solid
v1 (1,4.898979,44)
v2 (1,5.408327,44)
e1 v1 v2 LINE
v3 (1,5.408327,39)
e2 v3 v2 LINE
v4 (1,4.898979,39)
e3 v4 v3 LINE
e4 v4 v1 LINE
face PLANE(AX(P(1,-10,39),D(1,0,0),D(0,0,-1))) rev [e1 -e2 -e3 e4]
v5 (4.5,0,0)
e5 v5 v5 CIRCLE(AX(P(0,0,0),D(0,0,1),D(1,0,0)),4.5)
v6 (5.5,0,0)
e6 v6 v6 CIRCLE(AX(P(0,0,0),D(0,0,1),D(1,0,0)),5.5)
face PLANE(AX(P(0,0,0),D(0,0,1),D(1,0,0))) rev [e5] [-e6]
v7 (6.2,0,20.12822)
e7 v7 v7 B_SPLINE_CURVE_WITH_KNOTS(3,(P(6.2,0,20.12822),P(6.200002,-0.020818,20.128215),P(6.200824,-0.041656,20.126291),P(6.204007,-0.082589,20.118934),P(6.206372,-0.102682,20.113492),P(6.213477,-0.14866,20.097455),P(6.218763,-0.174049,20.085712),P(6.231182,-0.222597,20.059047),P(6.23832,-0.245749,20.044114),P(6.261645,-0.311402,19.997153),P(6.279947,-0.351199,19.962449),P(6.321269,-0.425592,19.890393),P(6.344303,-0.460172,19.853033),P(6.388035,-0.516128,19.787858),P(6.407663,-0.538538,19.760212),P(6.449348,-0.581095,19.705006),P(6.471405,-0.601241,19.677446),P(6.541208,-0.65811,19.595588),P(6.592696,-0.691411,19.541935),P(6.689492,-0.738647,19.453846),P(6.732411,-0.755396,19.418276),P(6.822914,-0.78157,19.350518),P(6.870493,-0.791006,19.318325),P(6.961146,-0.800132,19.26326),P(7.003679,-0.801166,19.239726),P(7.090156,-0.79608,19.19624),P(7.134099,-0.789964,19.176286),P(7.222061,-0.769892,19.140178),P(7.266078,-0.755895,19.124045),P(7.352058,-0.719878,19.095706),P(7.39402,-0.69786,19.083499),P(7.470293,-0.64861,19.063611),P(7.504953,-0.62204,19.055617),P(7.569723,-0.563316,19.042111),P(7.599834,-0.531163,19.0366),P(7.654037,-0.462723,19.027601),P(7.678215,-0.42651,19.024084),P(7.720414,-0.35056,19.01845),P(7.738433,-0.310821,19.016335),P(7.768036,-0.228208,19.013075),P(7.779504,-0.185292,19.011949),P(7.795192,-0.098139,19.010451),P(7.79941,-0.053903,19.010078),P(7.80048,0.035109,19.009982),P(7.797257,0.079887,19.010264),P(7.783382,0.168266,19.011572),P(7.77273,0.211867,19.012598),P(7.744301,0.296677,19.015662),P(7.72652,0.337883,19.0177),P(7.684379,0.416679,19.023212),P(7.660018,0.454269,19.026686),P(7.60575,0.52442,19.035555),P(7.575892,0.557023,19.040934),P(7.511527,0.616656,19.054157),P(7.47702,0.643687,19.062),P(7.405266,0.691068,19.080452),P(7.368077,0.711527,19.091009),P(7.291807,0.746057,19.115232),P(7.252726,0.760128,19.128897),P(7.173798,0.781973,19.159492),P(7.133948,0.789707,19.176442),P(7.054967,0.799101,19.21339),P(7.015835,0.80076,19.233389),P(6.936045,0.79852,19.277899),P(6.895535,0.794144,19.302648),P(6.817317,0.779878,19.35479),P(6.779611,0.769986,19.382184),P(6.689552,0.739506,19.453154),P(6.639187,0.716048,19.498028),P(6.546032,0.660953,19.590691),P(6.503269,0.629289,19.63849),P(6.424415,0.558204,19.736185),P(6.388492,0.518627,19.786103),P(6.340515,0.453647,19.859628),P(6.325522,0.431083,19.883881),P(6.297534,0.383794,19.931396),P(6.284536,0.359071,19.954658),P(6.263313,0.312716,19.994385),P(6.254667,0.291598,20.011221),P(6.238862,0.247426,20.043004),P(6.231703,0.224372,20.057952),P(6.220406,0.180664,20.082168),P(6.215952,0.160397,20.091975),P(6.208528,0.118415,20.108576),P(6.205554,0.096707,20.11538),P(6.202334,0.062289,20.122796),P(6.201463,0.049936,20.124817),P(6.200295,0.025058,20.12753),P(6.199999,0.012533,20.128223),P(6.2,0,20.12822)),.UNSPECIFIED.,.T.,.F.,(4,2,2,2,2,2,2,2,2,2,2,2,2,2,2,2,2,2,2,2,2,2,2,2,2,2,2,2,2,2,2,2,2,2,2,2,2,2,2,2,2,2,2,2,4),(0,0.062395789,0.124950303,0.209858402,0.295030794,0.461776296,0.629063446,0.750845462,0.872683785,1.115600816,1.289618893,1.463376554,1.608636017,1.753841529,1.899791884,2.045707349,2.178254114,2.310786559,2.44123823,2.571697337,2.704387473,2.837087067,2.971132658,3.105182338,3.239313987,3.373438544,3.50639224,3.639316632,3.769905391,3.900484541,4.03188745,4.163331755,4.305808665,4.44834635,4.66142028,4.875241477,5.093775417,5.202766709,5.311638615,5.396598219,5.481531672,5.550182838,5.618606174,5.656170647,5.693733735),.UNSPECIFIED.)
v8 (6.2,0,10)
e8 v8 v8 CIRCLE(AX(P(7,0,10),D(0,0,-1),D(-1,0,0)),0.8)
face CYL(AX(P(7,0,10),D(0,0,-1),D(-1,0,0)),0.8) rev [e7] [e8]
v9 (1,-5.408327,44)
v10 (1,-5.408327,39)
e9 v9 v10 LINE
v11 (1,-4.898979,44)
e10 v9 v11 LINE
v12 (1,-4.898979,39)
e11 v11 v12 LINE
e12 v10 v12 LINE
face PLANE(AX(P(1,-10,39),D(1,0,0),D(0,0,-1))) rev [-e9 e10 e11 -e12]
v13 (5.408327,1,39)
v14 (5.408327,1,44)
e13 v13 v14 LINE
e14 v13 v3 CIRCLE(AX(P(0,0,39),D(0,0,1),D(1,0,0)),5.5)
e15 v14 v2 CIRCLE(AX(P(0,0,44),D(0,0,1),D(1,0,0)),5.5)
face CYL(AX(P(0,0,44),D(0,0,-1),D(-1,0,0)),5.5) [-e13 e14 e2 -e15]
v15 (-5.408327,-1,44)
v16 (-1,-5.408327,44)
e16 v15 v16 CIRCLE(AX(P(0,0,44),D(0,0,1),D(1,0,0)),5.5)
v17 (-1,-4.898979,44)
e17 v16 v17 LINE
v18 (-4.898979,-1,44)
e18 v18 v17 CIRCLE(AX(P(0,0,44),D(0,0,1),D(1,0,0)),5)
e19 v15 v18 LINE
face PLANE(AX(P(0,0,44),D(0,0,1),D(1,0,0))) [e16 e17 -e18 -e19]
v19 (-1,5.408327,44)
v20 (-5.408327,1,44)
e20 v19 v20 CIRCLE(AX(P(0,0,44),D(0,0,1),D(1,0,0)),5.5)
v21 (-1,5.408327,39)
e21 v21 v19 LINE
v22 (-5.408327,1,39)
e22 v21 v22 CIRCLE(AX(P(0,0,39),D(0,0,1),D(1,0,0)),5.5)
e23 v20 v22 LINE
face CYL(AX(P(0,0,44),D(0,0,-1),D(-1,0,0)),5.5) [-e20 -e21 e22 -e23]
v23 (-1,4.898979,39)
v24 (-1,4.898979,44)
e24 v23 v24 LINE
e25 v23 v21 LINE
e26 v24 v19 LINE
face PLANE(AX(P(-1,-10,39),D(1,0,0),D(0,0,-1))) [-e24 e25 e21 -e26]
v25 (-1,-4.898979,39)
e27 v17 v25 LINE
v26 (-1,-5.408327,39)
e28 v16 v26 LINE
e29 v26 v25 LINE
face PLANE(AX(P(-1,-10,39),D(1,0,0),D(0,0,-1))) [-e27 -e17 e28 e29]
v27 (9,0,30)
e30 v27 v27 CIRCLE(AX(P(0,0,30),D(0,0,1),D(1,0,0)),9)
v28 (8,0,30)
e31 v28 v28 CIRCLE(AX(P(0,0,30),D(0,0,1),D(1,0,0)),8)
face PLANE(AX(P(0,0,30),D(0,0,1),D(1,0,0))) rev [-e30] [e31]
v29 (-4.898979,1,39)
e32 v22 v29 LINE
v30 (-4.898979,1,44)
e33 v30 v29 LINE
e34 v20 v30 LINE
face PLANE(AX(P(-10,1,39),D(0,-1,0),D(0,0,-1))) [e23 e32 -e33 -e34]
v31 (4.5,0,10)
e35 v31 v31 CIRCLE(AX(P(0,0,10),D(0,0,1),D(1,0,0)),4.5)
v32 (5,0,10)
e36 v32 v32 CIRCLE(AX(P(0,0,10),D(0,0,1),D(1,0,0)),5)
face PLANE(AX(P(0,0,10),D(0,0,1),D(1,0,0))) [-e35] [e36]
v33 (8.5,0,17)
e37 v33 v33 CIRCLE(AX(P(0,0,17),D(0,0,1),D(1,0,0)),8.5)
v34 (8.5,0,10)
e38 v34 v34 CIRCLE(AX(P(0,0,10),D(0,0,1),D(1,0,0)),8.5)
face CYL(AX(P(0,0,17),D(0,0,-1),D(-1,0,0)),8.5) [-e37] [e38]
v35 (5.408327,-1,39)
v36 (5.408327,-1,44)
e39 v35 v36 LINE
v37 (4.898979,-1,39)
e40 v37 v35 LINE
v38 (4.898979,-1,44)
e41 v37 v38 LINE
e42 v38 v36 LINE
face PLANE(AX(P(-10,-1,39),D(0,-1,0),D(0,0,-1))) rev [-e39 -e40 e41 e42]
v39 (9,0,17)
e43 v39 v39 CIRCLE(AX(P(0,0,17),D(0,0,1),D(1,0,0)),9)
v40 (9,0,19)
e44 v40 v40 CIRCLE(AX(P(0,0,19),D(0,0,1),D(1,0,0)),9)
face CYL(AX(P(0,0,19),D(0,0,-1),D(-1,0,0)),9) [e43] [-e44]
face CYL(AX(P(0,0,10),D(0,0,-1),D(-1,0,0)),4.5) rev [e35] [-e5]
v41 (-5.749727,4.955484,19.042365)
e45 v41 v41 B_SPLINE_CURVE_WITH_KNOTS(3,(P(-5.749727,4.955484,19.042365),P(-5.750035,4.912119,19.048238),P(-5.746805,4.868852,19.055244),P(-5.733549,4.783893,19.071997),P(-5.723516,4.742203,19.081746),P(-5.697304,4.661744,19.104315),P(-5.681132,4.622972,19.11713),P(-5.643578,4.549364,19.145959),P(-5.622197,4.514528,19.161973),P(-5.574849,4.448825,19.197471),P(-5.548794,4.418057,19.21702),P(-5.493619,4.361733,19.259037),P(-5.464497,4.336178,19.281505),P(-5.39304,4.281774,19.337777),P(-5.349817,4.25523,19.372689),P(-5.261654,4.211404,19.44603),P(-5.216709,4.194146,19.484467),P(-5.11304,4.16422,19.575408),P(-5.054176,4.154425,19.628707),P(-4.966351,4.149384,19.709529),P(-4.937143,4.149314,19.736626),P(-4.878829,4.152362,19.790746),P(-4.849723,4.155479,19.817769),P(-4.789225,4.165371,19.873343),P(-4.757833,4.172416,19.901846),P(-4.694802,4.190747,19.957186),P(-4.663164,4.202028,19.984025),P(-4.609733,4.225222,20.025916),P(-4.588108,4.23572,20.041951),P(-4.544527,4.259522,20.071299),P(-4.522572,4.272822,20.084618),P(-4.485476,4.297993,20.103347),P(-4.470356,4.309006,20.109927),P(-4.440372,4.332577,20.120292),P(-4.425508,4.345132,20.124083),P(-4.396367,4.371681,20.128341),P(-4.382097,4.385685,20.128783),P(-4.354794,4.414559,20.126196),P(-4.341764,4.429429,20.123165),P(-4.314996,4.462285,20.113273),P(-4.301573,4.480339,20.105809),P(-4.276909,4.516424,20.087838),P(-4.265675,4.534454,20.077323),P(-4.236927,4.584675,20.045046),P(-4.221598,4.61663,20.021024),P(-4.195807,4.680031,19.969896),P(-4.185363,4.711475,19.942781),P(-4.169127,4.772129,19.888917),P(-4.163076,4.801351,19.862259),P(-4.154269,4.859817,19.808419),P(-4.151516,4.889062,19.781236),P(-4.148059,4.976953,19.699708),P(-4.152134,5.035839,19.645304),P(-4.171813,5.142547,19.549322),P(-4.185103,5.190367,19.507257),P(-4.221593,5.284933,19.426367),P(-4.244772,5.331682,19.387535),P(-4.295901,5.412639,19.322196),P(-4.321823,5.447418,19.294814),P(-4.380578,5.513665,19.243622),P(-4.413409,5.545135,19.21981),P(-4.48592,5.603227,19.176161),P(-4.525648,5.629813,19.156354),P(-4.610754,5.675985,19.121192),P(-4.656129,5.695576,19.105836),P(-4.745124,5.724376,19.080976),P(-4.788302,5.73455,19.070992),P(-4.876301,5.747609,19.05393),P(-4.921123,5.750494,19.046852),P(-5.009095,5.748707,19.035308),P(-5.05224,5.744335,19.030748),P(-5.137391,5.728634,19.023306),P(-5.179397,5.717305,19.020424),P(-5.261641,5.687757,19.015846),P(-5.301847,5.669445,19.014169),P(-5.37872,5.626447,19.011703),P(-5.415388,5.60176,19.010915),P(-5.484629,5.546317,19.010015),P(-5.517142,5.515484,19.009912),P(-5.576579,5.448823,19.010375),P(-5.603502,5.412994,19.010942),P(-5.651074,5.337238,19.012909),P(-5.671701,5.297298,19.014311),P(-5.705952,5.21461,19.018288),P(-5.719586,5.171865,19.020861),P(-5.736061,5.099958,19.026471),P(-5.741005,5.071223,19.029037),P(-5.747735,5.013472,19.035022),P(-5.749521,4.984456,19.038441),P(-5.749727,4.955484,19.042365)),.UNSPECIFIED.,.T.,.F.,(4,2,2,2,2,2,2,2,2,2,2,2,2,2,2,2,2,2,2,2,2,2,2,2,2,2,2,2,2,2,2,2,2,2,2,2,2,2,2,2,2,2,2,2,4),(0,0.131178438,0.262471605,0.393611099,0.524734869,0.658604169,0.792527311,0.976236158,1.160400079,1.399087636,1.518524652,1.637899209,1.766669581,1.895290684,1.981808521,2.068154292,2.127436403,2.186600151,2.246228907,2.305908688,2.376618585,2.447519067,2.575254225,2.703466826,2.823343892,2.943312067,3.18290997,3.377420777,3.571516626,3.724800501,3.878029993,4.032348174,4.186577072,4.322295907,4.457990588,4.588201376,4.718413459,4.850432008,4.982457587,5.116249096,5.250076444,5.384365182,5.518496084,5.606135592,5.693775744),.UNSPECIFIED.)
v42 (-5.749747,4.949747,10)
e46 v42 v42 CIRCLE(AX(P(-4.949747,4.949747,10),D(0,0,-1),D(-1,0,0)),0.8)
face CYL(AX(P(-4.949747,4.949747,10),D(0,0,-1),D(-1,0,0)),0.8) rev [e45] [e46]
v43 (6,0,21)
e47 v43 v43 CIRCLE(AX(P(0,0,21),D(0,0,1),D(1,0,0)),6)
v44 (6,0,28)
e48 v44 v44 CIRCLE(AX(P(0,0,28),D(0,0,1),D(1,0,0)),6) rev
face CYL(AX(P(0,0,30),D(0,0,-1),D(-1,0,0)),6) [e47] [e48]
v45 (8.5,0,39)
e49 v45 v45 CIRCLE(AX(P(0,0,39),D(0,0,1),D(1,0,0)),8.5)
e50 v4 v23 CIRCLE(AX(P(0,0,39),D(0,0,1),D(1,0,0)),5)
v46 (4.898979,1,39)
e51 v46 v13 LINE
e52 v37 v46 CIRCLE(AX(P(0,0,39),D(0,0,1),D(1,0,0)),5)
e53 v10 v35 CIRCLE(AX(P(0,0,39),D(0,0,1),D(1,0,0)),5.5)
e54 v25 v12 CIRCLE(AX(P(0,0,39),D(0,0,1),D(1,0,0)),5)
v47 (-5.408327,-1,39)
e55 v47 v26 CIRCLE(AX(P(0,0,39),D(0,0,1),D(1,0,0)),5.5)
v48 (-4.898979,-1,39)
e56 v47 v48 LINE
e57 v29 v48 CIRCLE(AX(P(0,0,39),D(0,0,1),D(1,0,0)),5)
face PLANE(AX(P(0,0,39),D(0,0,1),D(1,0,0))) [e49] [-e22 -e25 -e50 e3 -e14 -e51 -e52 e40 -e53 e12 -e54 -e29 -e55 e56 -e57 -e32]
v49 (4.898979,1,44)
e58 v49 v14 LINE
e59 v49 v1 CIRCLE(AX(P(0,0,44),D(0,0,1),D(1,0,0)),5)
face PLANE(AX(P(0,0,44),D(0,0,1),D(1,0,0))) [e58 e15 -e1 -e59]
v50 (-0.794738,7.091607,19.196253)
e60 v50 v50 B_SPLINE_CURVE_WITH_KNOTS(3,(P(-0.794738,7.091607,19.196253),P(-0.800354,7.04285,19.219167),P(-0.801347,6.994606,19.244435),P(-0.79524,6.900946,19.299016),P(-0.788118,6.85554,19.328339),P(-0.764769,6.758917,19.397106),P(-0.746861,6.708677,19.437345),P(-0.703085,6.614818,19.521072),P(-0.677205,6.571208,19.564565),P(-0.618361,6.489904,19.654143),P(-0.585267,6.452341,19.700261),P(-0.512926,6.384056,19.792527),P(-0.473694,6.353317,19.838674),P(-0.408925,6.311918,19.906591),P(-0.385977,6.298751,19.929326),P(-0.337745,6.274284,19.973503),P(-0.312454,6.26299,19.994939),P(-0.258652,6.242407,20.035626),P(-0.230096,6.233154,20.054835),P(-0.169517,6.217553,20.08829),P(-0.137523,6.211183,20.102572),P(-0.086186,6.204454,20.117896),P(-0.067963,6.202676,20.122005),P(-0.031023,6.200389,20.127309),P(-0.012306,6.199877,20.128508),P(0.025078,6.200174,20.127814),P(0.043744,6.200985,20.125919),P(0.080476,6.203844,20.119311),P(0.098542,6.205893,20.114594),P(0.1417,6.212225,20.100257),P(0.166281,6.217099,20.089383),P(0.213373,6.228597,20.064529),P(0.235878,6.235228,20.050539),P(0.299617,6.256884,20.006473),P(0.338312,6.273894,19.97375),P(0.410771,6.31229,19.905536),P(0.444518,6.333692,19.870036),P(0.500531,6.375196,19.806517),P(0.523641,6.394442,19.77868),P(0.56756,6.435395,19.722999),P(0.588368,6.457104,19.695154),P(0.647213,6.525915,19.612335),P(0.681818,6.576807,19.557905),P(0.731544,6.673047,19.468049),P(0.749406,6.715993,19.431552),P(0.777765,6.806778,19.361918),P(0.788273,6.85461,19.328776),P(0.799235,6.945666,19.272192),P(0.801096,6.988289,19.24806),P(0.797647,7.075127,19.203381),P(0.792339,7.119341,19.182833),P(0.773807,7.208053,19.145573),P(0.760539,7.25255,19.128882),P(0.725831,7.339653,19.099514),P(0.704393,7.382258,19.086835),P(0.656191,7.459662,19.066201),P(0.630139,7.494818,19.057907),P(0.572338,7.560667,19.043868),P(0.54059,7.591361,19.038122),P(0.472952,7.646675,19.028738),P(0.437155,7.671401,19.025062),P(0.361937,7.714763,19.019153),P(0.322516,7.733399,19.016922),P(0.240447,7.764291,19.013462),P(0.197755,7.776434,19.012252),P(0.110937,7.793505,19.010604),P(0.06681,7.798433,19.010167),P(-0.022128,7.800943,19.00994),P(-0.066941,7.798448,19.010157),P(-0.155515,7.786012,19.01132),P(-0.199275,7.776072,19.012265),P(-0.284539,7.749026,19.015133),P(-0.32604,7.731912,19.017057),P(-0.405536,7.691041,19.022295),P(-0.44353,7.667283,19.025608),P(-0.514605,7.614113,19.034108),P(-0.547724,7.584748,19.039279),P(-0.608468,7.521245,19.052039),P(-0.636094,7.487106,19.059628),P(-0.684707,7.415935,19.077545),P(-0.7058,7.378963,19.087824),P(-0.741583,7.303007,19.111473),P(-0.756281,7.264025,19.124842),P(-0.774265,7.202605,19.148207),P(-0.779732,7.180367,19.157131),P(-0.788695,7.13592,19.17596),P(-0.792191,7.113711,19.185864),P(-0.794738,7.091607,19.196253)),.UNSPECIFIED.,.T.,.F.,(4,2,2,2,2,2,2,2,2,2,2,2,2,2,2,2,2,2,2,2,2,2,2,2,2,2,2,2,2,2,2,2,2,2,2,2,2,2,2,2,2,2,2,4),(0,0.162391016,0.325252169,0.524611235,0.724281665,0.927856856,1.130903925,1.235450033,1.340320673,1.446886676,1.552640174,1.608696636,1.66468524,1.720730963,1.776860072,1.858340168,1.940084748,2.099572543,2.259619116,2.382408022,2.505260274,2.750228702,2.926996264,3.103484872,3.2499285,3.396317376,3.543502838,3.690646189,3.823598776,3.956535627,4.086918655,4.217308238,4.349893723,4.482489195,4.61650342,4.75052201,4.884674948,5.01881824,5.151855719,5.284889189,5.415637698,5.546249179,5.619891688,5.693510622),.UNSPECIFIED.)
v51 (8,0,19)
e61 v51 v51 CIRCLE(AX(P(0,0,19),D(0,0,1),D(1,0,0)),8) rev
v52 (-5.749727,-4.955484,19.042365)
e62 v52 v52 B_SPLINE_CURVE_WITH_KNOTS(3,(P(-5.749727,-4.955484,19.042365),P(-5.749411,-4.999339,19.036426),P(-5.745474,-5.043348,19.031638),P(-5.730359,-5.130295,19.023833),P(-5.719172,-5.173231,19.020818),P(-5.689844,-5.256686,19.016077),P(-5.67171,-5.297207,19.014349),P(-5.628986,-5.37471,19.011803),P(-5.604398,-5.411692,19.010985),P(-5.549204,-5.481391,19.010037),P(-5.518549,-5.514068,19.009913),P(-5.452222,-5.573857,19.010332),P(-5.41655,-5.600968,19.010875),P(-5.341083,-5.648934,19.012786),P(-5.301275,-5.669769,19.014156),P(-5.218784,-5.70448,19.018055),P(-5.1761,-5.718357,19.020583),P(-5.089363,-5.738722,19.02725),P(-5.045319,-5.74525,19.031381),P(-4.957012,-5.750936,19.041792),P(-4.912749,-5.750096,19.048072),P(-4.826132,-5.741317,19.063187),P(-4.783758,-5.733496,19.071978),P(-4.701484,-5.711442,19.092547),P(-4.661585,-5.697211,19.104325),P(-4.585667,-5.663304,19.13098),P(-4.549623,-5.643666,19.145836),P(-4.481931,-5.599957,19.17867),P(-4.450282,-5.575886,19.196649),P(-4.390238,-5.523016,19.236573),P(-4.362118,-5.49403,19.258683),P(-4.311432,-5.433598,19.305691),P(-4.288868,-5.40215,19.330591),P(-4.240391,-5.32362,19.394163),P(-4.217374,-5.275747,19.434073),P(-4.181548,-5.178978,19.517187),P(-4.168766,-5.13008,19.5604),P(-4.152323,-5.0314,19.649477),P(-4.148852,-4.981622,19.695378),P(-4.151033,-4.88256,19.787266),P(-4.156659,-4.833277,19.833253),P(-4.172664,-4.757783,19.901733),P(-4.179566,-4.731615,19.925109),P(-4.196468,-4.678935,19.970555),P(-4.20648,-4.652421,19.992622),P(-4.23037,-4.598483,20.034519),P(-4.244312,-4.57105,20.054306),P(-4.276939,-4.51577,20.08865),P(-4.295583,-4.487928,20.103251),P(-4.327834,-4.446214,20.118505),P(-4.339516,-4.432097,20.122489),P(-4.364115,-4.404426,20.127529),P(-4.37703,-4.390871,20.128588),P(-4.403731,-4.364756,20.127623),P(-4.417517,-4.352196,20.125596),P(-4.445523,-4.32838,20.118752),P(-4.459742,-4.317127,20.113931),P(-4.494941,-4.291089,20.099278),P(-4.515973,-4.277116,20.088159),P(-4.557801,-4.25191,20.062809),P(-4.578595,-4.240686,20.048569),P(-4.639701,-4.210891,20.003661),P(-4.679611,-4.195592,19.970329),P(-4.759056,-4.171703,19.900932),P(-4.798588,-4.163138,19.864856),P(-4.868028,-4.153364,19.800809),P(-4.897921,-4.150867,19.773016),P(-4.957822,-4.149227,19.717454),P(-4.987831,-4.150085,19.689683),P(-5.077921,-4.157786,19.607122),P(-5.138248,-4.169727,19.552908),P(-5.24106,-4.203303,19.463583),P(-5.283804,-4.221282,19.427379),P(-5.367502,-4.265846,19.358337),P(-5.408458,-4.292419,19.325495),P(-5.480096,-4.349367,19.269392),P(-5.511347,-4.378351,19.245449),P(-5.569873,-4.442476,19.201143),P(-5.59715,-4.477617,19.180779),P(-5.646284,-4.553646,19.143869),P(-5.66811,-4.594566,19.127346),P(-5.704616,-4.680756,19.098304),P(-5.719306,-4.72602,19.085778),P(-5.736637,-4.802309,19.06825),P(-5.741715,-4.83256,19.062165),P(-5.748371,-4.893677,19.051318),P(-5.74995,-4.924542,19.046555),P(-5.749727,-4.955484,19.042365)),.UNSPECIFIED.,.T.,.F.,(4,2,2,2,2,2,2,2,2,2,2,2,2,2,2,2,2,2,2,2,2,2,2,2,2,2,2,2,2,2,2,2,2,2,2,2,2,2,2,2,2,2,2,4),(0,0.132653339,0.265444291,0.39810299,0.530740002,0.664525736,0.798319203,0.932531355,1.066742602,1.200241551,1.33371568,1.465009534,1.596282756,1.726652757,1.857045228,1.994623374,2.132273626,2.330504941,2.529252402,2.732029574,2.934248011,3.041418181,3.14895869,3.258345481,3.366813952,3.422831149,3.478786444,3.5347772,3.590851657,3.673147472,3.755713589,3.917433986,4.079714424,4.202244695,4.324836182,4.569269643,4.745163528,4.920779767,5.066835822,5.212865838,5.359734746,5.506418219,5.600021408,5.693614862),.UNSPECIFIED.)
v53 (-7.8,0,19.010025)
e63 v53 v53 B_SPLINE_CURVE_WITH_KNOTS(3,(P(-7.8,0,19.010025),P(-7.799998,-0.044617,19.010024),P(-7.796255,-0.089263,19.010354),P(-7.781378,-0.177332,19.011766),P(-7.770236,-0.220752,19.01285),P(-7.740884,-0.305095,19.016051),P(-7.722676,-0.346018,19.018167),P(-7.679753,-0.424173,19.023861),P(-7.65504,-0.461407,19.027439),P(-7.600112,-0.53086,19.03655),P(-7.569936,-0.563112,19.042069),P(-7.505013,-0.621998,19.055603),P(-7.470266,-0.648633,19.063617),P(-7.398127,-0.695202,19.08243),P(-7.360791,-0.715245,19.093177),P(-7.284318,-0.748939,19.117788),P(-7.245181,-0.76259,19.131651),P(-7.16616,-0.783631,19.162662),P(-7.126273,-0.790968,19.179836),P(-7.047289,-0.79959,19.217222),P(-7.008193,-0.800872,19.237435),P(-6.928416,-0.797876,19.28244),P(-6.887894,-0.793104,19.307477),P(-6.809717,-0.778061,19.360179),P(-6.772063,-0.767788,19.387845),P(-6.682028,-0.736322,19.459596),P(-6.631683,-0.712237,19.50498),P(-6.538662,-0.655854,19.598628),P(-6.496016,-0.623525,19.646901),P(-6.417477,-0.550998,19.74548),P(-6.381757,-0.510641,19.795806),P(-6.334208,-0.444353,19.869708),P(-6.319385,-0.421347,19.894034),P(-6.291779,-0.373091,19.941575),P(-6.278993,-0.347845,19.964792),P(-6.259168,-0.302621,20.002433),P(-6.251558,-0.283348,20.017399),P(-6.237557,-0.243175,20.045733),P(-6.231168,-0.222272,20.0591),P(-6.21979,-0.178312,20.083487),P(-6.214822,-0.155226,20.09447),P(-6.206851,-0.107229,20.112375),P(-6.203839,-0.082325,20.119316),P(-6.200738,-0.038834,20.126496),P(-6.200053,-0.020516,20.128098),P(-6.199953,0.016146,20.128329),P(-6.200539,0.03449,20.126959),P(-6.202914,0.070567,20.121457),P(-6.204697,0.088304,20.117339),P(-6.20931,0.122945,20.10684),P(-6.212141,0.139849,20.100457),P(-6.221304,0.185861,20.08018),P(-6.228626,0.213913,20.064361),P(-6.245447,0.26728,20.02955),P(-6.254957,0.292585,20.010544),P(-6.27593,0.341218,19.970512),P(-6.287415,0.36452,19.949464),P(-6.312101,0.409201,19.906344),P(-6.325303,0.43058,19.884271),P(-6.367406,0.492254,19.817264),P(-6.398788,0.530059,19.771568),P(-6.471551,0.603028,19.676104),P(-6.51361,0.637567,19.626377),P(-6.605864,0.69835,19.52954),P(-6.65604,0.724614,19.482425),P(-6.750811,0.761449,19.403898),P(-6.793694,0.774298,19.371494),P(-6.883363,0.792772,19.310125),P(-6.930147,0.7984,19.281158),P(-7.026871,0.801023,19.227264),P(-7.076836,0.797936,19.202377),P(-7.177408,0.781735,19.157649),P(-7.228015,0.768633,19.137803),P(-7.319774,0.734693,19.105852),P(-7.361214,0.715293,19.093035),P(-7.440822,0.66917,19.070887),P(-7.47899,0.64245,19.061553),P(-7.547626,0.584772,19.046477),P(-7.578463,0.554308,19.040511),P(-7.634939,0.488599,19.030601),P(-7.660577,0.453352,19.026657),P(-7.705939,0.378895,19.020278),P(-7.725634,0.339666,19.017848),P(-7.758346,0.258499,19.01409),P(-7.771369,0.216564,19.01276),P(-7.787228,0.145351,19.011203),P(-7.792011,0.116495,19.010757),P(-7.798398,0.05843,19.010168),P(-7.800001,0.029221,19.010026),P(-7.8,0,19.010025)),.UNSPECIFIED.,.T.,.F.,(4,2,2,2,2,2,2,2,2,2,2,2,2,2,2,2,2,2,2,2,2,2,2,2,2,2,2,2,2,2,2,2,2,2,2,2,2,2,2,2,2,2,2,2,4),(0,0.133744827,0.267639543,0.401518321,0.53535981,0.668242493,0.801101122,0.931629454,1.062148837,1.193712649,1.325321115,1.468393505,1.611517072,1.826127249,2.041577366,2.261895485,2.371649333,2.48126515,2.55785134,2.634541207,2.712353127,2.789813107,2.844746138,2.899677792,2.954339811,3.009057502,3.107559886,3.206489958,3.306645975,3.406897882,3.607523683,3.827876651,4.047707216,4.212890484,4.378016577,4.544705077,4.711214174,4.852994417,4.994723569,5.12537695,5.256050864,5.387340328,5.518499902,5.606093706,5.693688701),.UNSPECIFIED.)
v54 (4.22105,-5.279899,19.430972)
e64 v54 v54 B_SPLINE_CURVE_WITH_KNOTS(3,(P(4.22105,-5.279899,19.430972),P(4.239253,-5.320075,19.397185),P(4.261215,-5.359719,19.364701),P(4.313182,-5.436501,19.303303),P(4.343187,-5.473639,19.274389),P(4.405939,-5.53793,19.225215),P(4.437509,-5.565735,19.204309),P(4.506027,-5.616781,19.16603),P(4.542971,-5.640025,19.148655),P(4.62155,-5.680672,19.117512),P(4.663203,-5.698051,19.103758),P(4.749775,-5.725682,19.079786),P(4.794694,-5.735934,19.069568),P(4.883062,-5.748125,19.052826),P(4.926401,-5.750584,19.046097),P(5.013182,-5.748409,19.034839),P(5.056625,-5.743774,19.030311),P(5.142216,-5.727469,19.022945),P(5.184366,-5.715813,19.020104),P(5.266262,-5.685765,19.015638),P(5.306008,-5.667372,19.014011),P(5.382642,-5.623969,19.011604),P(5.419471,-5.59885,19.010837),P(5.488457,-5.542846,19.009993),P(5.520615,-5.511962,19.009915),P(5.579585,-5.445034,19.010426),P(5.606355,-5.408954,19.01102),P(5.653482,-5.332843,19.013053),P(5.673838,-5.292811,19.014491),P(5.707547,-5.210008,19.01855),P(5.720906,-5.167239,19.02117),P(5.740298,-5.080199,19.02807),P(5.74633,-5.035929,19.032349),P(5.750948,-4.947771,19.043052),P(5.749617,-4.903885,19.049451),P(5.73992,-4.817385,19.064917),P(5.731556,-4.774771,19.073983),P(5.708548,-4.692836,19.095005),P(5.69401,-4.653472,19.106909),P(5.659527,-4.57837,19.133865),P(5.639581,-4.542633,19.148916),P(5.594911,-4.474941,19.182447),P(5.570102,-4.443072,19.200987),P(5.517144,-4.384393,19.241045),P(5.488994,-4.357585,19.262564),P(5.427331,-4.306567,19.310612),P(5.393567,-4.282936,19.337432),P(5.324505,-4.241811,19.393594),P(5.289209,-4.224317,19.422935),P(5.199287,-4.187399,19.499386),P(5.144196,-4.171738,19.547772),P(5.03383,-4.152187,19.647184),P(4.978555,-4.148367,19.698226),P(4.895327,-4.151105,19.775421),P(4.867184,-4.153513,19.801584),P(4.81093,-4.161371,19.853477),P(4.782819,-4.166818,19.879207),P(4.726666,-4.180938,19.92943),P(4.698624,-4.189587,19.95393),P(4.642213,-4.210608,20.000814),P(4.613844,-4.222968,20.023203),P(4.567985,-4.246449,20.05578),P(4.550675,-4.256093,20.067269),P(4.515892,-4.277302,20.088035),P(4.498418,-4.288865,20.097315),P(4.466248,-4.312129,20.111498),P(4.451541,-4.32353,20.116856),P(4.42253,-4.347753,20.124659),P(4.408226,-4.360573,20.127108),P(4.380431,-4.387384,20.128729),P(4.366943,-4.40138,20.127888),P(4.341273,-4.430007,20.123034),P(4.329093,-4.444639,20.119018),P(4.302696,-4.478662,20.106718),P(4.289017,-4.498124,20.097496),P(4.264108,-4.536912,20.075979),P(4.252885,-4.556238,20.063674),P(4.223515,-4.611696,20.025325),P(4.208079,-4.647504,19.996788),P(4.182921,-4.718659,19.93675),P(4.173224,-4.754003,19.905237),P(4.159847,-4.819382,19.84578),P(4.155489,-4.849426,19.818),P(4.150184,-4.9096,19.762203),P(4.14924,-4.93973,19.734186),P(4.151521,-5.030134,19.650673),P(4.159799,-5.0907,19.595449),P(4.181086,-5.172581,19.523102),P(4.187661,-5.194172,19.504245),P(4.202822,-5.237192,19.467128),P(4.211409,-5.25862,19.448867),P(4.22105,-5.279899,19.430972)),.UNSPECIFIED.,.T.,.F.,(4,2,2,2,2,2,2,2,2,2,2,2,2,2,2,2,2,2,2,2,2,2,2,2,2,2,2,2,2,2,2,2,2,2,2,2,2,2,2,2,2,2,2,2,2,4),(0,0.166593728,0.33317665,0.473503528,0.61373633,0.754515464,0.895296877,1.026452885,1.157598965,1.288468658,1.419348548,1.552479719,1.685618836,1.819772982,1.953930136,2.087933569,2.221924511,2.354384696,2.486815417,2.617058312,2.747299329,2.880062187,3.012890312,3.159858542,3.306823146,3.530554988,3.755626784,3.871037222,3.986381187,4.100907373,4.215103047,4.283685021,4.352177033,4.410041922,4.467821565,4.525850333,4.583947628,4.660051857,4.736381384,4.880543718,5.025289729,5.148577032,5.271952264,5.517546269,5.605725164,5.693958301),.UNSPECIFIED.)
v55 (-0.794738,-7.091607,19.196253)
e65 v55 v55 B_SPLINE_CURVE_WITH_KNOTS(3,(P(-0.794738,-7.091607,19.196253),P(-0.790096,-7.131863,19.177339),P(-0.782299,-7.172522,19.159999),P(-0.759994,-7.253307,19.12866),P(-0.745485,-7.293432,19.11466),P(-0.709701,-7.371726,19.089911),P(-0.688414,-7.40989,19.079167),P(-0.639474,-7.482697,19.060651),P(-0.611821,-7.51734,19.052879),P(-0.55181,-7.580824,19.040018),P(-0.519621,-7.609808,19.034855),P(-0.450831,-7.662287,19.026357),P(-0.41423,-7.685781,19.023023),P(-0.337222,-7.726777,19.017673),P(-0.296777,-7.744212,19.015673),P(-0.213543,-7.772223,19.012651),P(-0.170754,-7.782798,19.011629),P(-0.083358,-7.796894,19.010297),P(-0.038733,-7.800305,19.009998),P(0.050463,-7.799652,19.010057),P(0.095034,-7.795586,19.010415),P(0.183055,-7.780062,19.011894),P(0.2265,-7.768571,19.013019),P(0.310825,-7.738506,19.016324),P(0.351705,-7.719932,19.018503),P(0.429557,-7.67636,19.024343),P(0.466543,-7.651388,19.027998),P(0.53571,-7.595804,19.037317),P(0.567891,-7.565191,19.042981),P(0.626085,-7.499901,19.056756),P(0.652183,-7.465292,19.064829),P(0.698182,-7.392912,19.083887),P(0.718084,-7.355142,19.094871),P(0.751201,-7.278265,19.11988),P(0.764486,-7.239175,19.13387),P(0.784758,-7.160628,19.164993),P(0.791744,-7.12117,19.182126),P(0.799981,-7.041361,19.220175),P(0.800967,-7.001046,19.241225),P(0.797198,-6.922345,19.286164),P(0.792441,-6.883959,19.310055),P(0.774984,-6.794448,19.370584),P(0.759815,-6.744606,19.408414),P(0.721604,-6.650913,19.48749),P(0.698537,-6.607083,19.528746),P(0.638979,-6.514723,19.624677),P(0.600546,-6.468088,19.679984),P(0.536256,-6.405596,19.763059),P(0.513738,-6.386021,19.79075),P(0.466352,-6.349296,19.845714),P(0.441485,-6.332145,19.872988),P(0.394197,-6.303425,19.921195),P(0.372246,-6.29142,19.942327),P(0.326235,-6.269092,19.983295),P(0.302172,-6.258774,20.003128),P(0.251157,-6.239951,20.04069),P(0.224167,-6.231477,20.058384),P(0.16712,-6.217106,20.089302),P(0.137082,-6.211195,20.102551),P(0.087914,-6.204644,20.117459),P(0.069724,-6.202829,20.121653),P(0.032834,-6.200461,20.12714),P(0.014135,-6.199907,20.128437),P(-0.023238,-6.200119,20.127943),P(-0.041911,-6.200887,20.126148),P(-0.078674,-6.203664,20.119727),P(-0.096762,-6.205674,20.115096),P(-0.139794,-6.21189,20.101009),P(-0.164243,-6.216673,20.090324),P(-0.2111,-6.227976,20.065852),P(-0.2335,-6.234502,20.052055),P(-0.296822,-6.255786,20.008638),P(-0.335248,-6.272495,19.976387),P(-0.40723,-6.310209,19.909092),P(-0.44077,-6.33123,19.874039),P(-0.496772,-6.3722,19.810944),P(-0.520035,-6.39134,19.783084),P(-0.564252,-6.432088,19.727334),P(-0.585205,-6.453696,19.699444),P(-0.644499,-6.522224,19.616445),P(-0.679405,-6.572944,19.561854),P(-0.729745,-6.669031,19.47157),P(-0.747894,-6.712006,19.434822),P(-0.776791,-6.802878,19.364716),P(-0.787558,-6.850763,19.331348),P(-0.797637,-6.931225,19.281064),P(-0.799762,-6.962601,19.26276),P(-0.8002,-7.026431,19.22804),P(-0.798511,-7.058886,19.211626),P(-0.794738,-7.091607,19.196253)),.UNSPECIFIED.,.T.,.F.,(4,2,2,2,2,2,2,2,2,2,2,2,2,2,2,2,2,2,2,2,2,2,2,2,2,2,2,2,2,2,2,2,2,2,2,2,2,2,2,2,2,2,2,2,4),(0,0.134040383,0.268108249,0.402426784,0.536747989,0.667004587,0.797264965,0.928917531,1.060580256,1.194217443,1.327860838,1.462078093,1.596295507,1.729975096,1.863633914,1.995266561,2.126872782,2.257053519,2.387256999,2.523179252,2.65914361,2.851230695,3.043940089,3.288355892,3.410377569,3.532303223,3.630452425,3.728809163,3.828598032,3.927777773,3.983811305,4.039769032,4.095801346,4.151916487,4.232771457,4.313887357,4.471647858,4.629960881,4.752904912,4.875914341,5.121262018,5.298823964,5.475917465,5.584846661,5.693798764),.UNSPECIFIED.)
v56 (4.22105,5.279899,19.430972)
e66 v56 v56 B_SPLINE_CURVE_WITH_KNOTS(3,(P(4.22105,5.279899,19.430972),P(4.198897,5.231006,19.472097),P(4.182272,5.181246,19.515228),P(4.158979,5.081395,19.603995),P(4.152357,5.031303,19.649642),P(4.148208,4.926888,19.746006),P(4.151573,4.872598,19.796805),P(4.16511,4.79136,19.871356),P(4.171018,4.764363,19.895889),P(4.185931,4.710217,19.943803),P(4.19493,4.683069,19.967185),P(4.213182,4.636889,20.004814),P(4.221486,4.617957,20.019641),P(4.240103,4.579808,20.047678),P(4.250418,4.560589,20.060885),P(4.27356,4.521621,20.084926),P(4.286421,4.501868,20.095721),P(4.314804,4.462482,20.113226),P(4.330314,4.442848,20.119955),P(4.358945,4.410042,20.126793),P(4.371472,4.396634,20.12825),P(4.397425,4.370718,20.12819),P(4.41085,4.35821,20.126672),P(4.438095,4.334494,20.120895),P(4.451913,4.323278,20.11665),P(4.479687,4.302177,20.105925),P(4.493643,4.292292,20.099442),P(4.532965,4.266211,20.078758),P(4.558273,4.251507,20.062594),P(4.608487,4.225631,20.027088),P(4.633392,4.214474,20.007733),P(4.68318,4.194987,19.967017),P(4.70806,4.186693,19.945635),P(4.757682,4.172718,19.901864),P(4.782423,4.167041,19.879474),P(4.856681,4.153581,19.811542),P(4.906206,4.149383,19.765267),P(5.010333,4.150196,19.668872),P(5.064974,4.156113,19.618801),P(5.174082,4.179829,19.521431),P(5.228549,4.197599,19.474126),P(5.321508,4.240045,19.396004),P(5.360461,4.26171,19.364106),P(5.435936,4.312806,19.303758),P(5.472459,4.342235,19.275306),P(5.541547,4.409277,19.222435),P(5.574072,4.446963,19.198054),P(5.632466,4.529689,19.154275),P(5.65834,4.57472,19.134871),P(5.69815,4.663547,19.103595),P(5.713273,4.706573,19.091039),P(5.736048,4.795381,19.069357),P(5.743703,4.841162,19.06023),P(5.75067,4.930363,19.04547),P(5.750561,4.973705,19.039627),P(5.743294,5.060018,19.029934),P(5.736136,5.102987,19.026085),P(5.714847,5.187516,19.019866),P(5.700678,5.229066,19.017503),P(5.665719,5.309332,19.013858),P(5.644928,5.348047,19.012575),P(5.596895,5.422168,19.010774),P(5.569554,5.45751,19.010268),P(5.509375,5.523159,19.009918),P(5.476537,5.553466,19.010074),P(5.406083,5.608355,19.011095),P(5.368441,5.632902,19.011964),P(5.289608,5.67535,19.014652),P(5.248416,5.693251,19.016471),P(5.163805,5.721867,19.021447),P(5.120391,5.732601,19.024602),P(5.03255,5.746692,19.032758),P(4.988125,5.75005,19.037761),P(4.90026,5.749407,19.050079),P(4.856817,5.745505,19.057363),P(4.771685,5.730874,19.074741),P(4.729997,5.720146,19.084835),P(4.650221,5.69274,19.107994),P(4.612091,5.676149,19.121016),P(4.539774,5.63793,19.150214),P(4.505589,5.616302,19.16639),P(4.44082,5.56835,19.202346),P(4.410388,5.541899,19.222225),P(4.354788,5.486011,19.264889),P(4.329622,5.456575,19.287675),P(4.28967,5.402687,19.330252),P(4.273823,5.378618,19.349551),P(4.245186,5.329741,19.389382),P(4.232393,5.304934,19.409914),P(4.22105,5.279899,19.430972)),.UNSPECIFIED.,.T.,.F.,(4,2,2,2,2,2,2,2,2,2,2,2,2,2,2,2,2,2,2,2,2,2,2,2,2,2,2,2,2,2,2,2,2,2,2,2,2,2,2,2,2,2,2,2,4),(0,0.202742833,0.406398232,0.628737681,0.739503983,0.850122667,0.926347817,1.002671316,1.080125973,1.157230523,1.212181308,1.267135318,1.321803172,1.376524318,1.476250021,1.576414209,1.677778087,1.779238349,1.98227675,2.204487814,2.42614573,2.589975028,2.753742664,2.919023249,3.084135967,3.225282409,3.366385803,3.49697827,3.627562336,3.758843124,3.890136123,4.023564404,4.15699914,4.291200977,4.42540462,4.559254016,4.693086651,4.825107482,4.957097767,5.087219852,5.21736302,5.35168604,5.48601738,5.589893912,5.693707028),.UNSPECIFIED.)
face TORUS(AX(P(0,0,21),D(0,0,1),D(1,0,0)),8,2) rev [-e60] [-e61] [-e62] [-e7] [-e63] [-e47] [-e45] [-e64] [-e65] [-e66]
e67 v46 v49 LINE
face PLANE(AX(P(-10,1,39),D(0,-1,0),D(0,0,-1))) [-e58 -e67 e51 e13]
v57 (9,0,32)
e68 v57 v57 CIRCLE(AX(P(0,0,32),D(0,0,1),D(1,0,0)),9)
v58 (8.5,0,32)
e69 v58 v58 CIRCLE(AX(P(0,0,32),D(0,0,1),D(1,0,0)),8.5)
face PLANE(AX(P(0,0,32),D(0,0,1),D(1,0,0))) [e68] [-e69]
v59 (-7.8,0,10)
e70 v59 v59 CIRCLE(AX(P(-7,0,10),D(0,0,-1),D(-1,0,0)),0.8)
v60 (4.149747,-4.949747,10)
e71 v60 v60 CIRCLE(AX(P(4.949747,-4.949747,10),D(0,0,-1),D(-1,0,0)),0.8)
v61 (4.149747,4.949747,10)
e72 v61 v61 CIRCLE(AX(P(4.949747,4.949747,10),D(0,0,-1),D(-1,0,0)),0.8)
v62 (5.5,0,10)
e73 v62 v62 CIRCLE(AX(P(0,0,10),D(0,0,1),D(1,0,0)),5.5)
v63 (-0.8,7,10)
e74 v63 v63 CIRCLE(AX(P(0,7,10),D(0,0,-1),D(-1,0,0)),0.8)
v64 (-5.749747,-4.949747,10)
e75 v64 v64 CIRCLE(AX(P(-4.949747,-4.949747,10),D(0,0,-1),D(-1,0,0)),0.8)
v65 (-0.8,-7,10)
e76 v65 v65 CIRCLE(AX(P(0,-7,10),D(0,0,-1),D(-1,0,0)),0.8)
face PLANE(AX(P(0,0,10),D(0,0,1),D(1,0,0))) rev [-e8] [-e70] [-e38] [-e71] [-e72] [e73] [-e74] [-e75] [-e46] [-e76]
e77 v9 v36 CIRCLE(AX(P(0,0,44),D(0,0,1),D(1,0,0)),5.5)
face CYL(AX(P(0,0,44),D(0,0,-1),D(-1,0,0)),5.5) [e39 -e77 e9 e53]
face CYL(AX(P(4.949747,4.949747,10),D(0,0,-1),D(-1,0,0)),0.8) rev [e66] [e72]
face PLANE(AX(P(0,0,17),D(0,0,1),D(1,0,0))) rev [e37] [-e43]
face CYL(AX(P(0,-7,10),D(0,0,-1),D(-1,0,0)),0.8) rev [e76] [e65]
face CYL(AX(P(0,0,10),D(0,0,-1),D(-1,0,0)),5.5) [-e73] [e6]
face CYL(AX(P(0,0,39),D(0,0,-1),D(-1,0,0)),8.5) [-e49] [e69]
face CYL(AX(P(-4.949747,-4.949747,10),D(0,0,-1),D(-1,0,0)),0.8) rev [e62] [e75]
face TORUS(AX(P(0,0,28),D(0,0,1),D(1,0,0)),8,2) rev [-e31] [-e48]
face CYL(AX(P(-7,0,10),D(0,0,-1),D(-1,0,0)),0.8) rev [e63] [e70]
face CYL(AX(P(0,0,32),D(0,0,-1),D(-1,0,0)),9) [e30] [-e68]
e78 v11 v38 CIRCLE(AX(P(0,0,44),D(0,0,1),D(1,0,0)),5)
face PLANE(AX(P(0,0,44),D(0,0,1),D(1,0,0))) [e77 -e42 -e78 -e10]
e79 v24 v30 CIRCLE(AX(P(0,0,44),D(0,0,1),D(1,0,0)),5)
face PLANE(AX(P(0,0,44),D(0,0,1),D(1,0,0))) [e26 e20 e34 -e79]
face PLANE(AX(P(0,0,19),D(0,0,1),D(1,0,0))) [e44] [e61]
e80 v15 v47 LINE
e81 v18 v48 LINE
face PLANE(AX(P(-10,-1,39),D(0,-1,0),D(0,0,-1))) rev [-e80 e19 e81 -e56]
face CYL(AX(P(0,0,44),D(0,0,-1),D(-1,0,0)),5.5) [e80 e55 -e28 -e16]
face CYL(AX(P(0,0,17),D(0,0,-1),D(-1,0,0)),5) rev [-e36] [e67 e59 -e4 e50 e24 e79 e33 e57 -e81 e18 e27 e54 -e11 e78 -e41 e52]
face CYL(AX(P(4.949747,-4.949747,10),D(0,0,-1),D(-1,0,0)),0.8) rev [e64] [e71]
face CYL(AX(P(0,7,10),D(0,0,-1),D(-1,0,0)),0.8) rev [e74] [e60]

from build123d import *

# Parameters (mm, degrees)
ESQUISSE1_R                                   = 5.5
ESQUISSE1_R_2                                 = 4.5
BOSS_EXTRU_1_DEPTH                            = 10
ESQUISSE3_R                                   = 8.5
ESQUISSE3_R_2                                 = 5
BOSS_EXTRU_3_DEPTH                            = 7
ESQUISSE4_R                                   = 9
ESQUISSE4_R_2                                 = 5
BOSS_EXTRU_4_DEPTH                            = 2
ESQUISSE7_R                                   = 6
ESQUISSE7_R_2                                 = 5
BOSS_EXTRU_7_DEPTH                            = 11
ESQUISSE8_R                                   = 9
ESQUISSE8_R_2                                 = 5
BOSS_EXTRU_8_DEPTH                            = 2
ESQUISSE15_R                                  = 8.5
ESQUISSE15_R_2                                = 5
BOSS_EXTRU_9_DEPTH                            = 7
ESQUISSE16_R                                  = 5.5
ESQUISSE16_R_2                                = 5
BOSS_EXTRU_10_DEPTH                           = 5
ESQUISSE17_W                                  = 20
ESQUISSE17_H                                  = 2
ESQUISSE17_W_2                                = 2
ESQUISSE17_H_2                                = 20
ENL_V_MAT_EXTRU_1_DEPTH                       = 5
TROU_POUR_TARAUDAGE_POUR_TROU_TARAUD_M2_D     = 1.6
TROU_POUR_TARAUDAGE_POUR_TROU_TARAUD_M2_DEPTH = 9
CONG_1_R                                      = 2


with BuildPart() as part:
    # Esquisse1 → Boss.-Extru.1 (new body)
    with BuildSketch(Plane.XY):
        Circle(ESQUISSE1_R)
        Circle(ESQUISSE1_R_2, mode=Mode.SUBTRACT)
    extrude(amount=BOSS_EXTRU_1_DEPTH)

    # Esquisse3 → Boss.-Extru.3 (add)
    with BuildSketch(Plane.XY.offset(10)):
        Circle(ESQUISSE3_R)
        Circle(ESQUISSE3_R_2, mode=Mode.SUBTRACT)
    extrude(amount=BOSS_EXTRU_3_DEPTH)

    # Esquisse4 → Boss.-Extru.4 (add)
    with BuildSketch(Plane.XY.offset(17)):
        Circle(ESQUISSE4_R)
        Circle(ESQUISSE4_R_2, mode=Mode.SUBTRACT)
    extrude(amount=BOSS_EXTRU_4_DEPTH)

    # Esquisse7 → Boss.-Extru.7 (add)
    with BuildSketch(Plane.XY.offset(19)):
        Circle(ESQUISSE7_R)
        Circle(ESQUISSE7_R_2, mode=Mode.SUBTRACT)
    extrude(amount=BOSS_EXTRU_7_DEPTH)

    # Esquisse8 → Boss.-Extru.8 (add)
    with BuildSketch(Plane.XY.offset(30)):
        Circle(ESQUISSE8_R)
        Circle(ESQUISSE8_R_2, mode=Mode.SUBTRACT)
    extrude(amount=BOSS_EXTRU_8_DEPTH)

    # Esquisse15 → Boss.-Extru.9 (add)
    with BuildSketch(Plane.XY.offset(32)):
        Circle(ESQUISSE15_R)
        Circle(ESQUISSE15_R_2, mode=Mode.SUBTRACT)
    extrude(amount=BOSS_EXTRU_9_DEPTH)

    # Esquisse16 → Boss.-Extru.10 (add)
    with BuildSketch(Plane.XY.offset(39)):
        Circle(ESQUISSE16_R)
        Circle(ESQUISSE16_R_2, mode=Mode.SUBTRACT)
    extrude(amount=BOSS_EXTRU_10_DEPTH)

    # Esquisse17 → Enlèv. mat.-Extru.1 (cut)
    with BuildSketch(Plane.XY.offset(44)):
        Rectangle(ESQUISSE17_W, ESQUISSE17_H)
        Rectangle(ESQUISSE17_W_2, ESQUISSE17_H_2)
    extrude(amount=-ENL_V_MAT_EXTRU_1_DEPTH, mode=Mode.SUBTRACT)

    # Trou pour taraudage pour trou taraudé M21
    with Locations(Plane(origin=(0, 0, 10), x_dir=(-1, 0, 0), z_dir=(0, 0, -1))):
        with Locations((-7, 0), (-4.949747468, 4.949747468), (0, 7), (4.949747468, 4.949747468), (7, 0), (4.949747468, -4.949747468), (0, -7), (-4.949747468, -4.949747468), (0, 0)):
            Hole(TROU_POUR_TARAUDAGE_POUR_TROU_TARAUD_M2_D / 2, depth=TROU_POUR_TARAUDAGE_POUR_TROU_TARAUD_M2_DEPTH)

    # Congé1
    # the kernel refuses this fillet: 2 mm, written as the material it adds along each edge
    with BuildSketch(Plane(origin=(0, 0, 30), x_dir=(1, 0, 0), z_dir=(0, -1, 0))) as cong_1_piece_1:
        with BuildLine():
            CenterArc((6 + CONG_1_R, -CONG_1_R), CONG_1_R, 90, 90)
            Line((6 + CONG_1_R, 0), (6, 0))
            Line((6, 0), (6, -CONG_1_R))
        make_face()
    revolve(axis=Axis((0, 0, 30), (0, 0, 1)))
    with BuildSketch(Plane(origin=(0, 0, 19), x_dir=(1, 0, 0), z_dir=(0, -1, 0))) as cong_1_piece_2_section:
        with BuildLine():
            CenterArc((6 + CONG_1_R, CONG_1_R), CONG_1_R, 180, 90)
            Line((6, CONG_1_R), (6, 0))
            Line((6, 0), (6 + CONG_1_R, 0))
        make_face()
    cong_1_piece_2 = revolve(axis=Axis((0, 0, 19), (0, 0, 1)), mode=Mode.PRIVATE)
    cong_1_piece_2 = cong_1_piece_2 - Plane(origin=(-4.949747468, -4.949747468, 19.036420824), x_dir=(1, 0, 0), z_dir=(0, 0, 1)) * Cylinder(0.8, 32, mode=Mode.PRIVATE)
    cong_1_piece_2 = cong_1_piece_2 - Plane(origin=(0, -7, 19.036420824), x_dir=(1, 0, 0), z_dir=(0, 0, 1)) * Cylinder(0.8, 32, mode=Mode.PRIVATE)
    cong_1_piece_2 = cong_1_piece_2 - Plane(origin=(4.949747468, -4.949747468, 19.036420824), x_dir=(1, 0, 0), z_dir=(0, 0, 1)) * Cylinder(0.8, 32, mode=Mode.PRIVATE)
    cong_1_piece_2 = cong_1_piece_2 - Plane(origin=(-7, 0, 19.036420824), x_dir=(1, 0, 0), z_dir=(0, 0, 1)) * Cylinder(0.8, 32, mode=Mode.PRIVATE)
    cong_1_piece_2 = cong_1_piece_2 - Plane(origin=(-4.949747468, 4.949747468, 19.036420824), x_dir=(1, 0, 0), z_dir=(0, 0, 1)) * Cylinder(0.8, 32, mode=Mode.PRIVATE)
    cong_1_piece_2 = cong_1_piece_2 - Plane(origin=(7, 0, 19.036420824), x_dir=(1, 0, 0), z_dir=(0, 0, 1)) * Cylinder(0.8, 32, mode=Mode.PRIVATE)
    cong_1_piece_2 = cong_1_piece_2 - Plane(origin=(0, 7, 19.036420824), x_dir=(1, 0, 0), z_dir=(0, 0, 1)) * Cylinder(0.8, 32, mode=Mode.PRIVATE)
    cong_1_piece_2 = cong_1_piece_2 - Plane(origin=(4.949747468, 4.949747468, 19.036420824), x_dir=(1, 0, 0), z_dir=(0, 0, 1)) * Cylinder(0.8, 32, mode=Mode.PRIVATE)
    add(cong_1_piece_2)


solid = part.part
